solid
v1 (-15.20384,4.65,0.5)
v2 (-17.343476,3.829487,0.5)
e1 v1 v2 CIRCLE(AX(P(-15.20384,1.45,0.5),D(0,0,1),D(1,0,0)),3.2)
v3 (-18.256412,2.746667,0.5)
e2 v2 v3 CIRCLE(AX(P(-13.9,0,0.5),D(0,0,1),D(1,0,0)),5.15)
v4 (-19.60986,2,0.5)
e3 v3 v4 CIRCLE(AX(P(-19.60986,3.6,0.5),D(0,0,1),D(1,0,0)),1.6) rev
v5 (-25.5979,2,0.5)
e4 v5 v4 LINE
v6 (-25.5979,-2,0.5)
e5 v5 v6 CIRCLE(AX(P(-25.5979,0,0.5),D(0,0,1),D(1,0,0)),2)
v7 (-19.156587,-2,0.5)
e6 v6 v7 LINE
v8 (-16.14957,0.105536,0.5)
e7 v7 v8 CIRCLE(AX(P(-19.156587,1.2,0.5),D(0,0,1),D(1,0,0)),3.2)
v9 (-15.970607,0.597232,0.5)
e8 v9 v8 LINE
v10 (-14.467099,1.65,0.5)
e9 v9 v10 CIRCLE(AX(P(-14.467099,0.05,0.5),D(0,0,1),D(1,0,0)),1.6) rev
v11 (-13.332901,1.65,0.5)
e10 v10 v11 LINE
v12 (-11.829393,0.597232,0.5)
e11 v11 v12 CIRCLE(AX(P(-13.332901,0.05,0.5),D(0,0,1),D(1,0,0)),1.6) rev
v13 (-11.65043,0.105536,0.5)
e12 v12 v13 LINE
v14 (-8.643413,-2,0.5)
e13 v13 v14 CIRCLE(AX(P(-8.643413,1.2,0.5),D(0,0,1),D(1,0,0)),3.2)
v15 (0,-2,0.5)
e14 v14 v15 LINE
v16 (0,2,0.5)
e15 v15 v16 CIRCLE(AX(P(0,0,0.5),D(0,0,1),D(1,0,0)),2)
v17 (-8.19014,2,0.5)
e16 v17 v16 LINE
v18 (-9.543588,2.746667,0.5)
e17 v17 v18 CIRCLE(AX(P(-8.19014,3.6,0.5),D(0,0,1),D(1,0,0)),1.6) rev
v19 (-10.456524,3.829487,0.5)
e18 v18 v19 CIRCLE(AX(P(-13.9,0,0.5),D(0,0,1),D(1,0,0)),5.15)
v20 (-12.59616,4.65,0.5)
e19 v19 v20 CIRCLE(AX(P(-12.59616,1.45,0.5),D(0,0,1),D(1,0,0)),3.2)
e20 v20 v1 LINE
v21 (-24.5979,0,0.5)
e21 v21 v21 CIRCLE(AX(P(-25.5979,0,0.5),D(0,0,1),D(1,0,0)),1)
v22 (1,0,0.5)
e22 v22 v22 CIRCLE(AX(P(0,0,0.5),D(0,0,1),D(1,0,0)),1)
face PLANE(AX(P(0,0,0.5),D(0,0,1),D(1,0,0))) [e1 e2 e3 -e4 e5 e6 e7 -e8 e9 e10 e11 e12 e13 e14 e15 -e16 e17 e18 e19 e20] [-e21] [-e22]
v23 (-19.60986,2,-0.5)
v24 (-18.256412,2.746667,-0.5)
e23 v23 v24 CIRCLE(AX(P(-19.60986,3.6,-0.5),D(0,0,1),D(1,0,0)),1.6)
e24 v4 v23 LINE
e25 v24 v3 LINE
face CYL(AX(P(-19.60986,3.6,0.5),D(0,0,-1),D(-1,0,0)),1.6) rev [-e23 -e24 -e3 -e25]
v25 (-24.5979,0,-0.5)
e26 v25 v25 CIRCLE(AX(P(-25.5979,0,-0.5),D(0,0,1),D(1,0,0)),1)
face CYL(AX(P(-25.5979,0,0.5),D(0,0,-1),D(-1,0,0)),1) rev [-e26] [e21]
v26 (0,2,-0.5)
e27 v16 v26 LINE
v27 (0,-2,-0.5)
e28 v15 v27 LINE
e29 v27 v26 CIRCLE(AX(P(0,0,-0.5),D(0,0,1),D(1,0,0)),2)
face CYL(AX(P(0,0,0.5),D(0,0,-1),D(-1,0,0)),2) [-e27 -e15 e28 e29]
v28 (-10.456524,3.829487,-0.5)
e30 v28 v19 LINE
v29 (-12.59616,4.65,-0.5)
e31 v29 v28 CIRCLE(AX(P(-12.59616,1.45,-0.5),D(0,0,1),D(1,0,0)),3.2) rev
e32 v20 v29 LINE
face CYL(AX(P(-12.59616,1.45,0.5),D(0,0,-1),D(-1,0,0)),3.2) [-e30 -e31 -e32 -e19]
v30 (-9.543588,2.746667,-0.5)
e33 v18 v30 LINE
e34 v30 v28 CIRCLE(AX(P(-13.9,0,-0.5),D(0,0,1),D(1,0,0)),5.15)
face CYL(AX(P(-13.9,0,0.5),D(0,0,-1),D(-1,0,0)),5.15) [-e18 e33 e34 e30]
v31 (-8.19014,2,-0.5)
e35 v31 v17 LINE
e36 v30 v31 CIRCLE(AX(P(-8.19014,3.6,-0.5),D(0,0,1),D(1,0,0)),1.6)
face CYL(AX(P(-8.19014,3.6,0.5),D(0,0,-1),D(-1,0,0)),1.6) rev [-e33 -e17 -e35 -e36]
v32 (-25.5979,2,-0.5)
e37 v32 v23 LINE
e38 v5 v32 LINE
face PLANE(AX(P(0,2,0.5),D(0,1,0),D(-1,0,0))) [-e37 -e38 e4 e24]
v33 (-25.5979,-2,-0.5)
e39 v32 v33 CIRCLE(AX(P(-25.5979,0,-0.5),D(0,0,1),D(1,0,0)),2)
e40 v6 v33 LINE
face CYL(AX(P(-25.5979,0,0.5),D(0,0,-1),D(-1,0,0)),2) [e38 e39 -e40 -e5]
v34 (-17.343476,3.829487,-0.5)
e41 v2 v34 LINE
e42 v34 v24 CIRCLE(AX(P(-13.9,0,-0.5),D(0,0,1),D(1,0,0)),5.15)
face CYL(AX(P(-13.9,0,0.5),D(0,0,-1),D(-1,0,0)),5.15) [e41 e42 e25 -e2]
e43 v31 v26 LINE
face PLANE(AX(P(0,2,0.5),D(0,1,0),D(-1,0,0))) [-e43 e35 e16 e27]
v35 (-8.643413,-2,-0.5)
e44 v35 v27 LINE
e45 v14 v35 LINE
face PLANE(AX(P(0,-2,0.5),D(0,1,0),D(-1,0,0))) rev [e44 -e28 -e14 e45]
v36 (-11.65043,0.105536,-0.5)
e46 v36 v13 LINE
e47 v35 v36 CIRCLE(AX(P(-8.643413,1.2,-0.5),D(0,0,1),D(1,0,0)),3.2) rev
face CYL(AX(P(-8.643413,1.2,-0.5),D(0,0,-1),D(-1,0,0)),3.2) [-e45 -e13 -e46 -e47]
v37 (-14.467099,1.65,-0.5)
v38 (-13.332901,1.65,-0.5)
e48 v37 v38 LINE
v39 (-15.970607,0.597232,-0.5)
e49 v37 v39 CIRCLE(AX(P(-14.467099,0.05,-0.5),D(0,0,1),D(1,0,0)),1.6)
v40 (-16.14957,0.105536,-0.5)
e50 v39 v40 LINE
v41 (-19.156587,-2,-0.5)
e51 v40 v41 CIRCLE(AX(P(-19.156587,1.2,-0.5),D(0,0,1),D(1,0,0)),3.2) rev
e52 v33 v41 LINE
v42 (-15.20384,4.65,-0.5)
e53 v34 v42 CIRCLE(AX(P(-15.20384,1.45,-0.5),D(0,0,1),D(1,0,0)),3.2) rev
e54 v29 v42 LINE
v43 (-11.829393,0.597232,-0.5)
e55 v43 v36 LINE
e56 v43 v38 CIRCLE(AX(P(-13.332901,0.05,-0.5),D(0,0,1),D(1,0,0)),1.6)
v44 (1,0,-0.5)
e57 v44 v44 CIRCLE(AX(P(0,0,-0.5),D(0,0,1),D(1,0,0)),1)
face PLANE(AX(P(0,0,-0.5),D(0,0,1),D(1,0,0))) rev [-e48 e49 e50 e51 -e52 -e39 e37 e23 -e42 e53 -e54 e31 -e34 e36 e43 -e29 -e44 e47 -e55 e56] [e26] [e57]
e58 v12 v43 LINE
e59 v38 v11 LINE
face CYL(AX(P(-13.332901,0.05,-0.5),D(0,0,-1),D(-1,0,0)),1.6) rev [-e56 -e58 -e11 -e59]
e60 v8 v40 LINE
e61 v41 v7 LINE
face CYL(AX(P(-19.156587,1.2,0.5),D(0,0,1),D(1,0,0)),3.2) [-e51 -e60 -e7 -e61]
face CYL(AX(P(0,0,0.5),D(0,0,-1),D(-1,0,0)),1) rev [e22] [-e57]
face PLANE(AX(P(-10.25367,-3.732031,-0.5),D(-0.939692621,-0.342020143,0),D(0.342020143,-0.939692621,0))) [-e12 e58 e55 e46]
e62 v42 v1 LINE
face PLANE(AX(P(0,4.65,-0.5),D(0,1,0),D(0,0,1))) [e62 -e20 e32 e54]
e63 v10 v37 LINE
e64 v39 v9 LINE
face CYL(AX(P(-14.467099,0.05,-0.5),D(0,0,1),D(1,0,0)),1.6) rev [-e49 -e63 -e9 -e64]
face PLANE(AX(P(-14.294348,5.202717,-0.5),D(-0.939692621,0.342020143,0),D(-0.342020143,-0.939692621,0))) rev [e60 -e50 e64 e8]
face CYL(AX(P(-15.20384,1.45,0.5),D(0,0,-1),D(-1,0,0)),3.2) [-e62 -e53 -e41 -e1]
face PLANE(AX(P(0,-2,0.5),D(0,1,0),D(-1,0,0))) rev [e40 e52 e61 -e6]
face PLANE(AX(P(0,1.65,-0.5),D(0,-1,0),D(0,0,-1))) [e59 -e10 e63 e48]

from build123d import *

# Parameters (mm, degrees)
SKETCH_1_R      = 1
EXTRUDE_1_DEPTH = 0.5
EXTRUDE1_DEPTH  = 0.5
EXTRUDE2_DEPTH  = 0.5
FILLET2_R       = 1.6
FILLET3_R       = 3.2


with BuildPart() as part:
    # Эскиз1 → Бобышка-Вытянуть1 (new, symmetric)
    with BuildSketch(Plane.XY):
        with BuildLine():
            Line((0, 2), (-25.5979, 2))
            ThreePointArc((-25.5979, 2), (-27.5979, 0), (-25.5979, -2))
            Line((-25.5979, -2), (0, -2))
            ThreePointArc((0, -2), (2, 0), (0, 2))
        make_face()
        with Locations((-25.5979, 0)):
            Circle(SKETCH_1_R, mode=Mode.SUBTRACT)
        Circle(SKETCH_1_R, mode=Mode.SUBTRACT)
    extrude(amount=EXTRUDE_1_DEPTH, both=True)

    # Sketch2 → Extrude1 (add, symmetric)
    with BuildSketch(Plane.XY):
        with BuildLine():
            Line((-13.9, 0), (-11.75, 0))
            ThreePointArc((-11.75, 0), (-11.782663331, 0.373343582), (-11.879660865, 0.735343308))
            Line((-11.879660865, 0.735343308), (-11.612017789, 0))
            Line((-11.612017789, 0), (-8.75, 0))
            ThreePointArc((-8.75, 0), (-14.920219052, 5.047935527), (-18.645787606, -2))
            Line((-18.645787606, -2), (-16.915922679, -2))
            Line((-16.915922679, -2), (-15.920339135, 0.735343308))
            ThreePointArc((-15.920339135, 0.735343308), (-15.860511069, -0.882551045), (-14.688986692, -2))
            Line((-14.688986692, -2), (-13.9, -2))
            Line((-13.9, -2), (-13.9, 0))
        make_face()
    extrude(amount=EXTRUDE1_DEPTH, both=True)

    # Sketch → Extrude2 (cut, symmetric)
    with BuildSketch(Plane.XY):
        with BuildLine():
            Line((-10.884077321, -2), (-11.879660865, 0.735343308))
            ThreePointArc((-11.879660865, 0.735343308), (-12.140166364, 1.235105491), (-12.521595125, 1.65))
            Line((-12.521595125, 1.65), (-15.278404875, 1.65))
            ThreePointArc((-15.278404875, 1.65), (-15.659833636, 1.235105491), (-15.920339135, 0.735343308))
            Line((-15.920339135, 0.735343308), (-16.915922679, -2))
            Line((-16.915922679, -2), (-10.884077321, -2))
        make_face()
        with BuildLine():
            ThreePointArc((-11.686405638, 4.65), (-13.9, 5.15), (-16.113594362, 4.65))
            Line((-16.113594362, 4.65), (-11.686405638, 4.65))
        make_face()
    extrude(amount=EXTRUDE2_DEPTH, both=True, mode=Mode.SUBTRACT)

    # Fillet2
    fillet2_edges = [part.edges().sort_by_distance(p)[0] for p in [
        (-9.154212394, 2, 0),
        (-18.645787606, 2, 0),
        (-12.521595125, 1.65, 0),
        (-15.278404875, 1.65, 0),
    ]]
    fillet(fillet2_edges, radius=FILLET2_R)

    # Fillet3
    fillet3_edges = [part.edges().sort_by_distance(p)[0] for p in [
        (-10.884077321, -2, 0),
        (-16.915922679, -2, 0),
        (-11.686405638, 4.65, 0),
        (-16.113594362, 4.65, 0),
    ]]
    fillet(fillet3_edges, radius=FILLET3_R)


solid = part.part
